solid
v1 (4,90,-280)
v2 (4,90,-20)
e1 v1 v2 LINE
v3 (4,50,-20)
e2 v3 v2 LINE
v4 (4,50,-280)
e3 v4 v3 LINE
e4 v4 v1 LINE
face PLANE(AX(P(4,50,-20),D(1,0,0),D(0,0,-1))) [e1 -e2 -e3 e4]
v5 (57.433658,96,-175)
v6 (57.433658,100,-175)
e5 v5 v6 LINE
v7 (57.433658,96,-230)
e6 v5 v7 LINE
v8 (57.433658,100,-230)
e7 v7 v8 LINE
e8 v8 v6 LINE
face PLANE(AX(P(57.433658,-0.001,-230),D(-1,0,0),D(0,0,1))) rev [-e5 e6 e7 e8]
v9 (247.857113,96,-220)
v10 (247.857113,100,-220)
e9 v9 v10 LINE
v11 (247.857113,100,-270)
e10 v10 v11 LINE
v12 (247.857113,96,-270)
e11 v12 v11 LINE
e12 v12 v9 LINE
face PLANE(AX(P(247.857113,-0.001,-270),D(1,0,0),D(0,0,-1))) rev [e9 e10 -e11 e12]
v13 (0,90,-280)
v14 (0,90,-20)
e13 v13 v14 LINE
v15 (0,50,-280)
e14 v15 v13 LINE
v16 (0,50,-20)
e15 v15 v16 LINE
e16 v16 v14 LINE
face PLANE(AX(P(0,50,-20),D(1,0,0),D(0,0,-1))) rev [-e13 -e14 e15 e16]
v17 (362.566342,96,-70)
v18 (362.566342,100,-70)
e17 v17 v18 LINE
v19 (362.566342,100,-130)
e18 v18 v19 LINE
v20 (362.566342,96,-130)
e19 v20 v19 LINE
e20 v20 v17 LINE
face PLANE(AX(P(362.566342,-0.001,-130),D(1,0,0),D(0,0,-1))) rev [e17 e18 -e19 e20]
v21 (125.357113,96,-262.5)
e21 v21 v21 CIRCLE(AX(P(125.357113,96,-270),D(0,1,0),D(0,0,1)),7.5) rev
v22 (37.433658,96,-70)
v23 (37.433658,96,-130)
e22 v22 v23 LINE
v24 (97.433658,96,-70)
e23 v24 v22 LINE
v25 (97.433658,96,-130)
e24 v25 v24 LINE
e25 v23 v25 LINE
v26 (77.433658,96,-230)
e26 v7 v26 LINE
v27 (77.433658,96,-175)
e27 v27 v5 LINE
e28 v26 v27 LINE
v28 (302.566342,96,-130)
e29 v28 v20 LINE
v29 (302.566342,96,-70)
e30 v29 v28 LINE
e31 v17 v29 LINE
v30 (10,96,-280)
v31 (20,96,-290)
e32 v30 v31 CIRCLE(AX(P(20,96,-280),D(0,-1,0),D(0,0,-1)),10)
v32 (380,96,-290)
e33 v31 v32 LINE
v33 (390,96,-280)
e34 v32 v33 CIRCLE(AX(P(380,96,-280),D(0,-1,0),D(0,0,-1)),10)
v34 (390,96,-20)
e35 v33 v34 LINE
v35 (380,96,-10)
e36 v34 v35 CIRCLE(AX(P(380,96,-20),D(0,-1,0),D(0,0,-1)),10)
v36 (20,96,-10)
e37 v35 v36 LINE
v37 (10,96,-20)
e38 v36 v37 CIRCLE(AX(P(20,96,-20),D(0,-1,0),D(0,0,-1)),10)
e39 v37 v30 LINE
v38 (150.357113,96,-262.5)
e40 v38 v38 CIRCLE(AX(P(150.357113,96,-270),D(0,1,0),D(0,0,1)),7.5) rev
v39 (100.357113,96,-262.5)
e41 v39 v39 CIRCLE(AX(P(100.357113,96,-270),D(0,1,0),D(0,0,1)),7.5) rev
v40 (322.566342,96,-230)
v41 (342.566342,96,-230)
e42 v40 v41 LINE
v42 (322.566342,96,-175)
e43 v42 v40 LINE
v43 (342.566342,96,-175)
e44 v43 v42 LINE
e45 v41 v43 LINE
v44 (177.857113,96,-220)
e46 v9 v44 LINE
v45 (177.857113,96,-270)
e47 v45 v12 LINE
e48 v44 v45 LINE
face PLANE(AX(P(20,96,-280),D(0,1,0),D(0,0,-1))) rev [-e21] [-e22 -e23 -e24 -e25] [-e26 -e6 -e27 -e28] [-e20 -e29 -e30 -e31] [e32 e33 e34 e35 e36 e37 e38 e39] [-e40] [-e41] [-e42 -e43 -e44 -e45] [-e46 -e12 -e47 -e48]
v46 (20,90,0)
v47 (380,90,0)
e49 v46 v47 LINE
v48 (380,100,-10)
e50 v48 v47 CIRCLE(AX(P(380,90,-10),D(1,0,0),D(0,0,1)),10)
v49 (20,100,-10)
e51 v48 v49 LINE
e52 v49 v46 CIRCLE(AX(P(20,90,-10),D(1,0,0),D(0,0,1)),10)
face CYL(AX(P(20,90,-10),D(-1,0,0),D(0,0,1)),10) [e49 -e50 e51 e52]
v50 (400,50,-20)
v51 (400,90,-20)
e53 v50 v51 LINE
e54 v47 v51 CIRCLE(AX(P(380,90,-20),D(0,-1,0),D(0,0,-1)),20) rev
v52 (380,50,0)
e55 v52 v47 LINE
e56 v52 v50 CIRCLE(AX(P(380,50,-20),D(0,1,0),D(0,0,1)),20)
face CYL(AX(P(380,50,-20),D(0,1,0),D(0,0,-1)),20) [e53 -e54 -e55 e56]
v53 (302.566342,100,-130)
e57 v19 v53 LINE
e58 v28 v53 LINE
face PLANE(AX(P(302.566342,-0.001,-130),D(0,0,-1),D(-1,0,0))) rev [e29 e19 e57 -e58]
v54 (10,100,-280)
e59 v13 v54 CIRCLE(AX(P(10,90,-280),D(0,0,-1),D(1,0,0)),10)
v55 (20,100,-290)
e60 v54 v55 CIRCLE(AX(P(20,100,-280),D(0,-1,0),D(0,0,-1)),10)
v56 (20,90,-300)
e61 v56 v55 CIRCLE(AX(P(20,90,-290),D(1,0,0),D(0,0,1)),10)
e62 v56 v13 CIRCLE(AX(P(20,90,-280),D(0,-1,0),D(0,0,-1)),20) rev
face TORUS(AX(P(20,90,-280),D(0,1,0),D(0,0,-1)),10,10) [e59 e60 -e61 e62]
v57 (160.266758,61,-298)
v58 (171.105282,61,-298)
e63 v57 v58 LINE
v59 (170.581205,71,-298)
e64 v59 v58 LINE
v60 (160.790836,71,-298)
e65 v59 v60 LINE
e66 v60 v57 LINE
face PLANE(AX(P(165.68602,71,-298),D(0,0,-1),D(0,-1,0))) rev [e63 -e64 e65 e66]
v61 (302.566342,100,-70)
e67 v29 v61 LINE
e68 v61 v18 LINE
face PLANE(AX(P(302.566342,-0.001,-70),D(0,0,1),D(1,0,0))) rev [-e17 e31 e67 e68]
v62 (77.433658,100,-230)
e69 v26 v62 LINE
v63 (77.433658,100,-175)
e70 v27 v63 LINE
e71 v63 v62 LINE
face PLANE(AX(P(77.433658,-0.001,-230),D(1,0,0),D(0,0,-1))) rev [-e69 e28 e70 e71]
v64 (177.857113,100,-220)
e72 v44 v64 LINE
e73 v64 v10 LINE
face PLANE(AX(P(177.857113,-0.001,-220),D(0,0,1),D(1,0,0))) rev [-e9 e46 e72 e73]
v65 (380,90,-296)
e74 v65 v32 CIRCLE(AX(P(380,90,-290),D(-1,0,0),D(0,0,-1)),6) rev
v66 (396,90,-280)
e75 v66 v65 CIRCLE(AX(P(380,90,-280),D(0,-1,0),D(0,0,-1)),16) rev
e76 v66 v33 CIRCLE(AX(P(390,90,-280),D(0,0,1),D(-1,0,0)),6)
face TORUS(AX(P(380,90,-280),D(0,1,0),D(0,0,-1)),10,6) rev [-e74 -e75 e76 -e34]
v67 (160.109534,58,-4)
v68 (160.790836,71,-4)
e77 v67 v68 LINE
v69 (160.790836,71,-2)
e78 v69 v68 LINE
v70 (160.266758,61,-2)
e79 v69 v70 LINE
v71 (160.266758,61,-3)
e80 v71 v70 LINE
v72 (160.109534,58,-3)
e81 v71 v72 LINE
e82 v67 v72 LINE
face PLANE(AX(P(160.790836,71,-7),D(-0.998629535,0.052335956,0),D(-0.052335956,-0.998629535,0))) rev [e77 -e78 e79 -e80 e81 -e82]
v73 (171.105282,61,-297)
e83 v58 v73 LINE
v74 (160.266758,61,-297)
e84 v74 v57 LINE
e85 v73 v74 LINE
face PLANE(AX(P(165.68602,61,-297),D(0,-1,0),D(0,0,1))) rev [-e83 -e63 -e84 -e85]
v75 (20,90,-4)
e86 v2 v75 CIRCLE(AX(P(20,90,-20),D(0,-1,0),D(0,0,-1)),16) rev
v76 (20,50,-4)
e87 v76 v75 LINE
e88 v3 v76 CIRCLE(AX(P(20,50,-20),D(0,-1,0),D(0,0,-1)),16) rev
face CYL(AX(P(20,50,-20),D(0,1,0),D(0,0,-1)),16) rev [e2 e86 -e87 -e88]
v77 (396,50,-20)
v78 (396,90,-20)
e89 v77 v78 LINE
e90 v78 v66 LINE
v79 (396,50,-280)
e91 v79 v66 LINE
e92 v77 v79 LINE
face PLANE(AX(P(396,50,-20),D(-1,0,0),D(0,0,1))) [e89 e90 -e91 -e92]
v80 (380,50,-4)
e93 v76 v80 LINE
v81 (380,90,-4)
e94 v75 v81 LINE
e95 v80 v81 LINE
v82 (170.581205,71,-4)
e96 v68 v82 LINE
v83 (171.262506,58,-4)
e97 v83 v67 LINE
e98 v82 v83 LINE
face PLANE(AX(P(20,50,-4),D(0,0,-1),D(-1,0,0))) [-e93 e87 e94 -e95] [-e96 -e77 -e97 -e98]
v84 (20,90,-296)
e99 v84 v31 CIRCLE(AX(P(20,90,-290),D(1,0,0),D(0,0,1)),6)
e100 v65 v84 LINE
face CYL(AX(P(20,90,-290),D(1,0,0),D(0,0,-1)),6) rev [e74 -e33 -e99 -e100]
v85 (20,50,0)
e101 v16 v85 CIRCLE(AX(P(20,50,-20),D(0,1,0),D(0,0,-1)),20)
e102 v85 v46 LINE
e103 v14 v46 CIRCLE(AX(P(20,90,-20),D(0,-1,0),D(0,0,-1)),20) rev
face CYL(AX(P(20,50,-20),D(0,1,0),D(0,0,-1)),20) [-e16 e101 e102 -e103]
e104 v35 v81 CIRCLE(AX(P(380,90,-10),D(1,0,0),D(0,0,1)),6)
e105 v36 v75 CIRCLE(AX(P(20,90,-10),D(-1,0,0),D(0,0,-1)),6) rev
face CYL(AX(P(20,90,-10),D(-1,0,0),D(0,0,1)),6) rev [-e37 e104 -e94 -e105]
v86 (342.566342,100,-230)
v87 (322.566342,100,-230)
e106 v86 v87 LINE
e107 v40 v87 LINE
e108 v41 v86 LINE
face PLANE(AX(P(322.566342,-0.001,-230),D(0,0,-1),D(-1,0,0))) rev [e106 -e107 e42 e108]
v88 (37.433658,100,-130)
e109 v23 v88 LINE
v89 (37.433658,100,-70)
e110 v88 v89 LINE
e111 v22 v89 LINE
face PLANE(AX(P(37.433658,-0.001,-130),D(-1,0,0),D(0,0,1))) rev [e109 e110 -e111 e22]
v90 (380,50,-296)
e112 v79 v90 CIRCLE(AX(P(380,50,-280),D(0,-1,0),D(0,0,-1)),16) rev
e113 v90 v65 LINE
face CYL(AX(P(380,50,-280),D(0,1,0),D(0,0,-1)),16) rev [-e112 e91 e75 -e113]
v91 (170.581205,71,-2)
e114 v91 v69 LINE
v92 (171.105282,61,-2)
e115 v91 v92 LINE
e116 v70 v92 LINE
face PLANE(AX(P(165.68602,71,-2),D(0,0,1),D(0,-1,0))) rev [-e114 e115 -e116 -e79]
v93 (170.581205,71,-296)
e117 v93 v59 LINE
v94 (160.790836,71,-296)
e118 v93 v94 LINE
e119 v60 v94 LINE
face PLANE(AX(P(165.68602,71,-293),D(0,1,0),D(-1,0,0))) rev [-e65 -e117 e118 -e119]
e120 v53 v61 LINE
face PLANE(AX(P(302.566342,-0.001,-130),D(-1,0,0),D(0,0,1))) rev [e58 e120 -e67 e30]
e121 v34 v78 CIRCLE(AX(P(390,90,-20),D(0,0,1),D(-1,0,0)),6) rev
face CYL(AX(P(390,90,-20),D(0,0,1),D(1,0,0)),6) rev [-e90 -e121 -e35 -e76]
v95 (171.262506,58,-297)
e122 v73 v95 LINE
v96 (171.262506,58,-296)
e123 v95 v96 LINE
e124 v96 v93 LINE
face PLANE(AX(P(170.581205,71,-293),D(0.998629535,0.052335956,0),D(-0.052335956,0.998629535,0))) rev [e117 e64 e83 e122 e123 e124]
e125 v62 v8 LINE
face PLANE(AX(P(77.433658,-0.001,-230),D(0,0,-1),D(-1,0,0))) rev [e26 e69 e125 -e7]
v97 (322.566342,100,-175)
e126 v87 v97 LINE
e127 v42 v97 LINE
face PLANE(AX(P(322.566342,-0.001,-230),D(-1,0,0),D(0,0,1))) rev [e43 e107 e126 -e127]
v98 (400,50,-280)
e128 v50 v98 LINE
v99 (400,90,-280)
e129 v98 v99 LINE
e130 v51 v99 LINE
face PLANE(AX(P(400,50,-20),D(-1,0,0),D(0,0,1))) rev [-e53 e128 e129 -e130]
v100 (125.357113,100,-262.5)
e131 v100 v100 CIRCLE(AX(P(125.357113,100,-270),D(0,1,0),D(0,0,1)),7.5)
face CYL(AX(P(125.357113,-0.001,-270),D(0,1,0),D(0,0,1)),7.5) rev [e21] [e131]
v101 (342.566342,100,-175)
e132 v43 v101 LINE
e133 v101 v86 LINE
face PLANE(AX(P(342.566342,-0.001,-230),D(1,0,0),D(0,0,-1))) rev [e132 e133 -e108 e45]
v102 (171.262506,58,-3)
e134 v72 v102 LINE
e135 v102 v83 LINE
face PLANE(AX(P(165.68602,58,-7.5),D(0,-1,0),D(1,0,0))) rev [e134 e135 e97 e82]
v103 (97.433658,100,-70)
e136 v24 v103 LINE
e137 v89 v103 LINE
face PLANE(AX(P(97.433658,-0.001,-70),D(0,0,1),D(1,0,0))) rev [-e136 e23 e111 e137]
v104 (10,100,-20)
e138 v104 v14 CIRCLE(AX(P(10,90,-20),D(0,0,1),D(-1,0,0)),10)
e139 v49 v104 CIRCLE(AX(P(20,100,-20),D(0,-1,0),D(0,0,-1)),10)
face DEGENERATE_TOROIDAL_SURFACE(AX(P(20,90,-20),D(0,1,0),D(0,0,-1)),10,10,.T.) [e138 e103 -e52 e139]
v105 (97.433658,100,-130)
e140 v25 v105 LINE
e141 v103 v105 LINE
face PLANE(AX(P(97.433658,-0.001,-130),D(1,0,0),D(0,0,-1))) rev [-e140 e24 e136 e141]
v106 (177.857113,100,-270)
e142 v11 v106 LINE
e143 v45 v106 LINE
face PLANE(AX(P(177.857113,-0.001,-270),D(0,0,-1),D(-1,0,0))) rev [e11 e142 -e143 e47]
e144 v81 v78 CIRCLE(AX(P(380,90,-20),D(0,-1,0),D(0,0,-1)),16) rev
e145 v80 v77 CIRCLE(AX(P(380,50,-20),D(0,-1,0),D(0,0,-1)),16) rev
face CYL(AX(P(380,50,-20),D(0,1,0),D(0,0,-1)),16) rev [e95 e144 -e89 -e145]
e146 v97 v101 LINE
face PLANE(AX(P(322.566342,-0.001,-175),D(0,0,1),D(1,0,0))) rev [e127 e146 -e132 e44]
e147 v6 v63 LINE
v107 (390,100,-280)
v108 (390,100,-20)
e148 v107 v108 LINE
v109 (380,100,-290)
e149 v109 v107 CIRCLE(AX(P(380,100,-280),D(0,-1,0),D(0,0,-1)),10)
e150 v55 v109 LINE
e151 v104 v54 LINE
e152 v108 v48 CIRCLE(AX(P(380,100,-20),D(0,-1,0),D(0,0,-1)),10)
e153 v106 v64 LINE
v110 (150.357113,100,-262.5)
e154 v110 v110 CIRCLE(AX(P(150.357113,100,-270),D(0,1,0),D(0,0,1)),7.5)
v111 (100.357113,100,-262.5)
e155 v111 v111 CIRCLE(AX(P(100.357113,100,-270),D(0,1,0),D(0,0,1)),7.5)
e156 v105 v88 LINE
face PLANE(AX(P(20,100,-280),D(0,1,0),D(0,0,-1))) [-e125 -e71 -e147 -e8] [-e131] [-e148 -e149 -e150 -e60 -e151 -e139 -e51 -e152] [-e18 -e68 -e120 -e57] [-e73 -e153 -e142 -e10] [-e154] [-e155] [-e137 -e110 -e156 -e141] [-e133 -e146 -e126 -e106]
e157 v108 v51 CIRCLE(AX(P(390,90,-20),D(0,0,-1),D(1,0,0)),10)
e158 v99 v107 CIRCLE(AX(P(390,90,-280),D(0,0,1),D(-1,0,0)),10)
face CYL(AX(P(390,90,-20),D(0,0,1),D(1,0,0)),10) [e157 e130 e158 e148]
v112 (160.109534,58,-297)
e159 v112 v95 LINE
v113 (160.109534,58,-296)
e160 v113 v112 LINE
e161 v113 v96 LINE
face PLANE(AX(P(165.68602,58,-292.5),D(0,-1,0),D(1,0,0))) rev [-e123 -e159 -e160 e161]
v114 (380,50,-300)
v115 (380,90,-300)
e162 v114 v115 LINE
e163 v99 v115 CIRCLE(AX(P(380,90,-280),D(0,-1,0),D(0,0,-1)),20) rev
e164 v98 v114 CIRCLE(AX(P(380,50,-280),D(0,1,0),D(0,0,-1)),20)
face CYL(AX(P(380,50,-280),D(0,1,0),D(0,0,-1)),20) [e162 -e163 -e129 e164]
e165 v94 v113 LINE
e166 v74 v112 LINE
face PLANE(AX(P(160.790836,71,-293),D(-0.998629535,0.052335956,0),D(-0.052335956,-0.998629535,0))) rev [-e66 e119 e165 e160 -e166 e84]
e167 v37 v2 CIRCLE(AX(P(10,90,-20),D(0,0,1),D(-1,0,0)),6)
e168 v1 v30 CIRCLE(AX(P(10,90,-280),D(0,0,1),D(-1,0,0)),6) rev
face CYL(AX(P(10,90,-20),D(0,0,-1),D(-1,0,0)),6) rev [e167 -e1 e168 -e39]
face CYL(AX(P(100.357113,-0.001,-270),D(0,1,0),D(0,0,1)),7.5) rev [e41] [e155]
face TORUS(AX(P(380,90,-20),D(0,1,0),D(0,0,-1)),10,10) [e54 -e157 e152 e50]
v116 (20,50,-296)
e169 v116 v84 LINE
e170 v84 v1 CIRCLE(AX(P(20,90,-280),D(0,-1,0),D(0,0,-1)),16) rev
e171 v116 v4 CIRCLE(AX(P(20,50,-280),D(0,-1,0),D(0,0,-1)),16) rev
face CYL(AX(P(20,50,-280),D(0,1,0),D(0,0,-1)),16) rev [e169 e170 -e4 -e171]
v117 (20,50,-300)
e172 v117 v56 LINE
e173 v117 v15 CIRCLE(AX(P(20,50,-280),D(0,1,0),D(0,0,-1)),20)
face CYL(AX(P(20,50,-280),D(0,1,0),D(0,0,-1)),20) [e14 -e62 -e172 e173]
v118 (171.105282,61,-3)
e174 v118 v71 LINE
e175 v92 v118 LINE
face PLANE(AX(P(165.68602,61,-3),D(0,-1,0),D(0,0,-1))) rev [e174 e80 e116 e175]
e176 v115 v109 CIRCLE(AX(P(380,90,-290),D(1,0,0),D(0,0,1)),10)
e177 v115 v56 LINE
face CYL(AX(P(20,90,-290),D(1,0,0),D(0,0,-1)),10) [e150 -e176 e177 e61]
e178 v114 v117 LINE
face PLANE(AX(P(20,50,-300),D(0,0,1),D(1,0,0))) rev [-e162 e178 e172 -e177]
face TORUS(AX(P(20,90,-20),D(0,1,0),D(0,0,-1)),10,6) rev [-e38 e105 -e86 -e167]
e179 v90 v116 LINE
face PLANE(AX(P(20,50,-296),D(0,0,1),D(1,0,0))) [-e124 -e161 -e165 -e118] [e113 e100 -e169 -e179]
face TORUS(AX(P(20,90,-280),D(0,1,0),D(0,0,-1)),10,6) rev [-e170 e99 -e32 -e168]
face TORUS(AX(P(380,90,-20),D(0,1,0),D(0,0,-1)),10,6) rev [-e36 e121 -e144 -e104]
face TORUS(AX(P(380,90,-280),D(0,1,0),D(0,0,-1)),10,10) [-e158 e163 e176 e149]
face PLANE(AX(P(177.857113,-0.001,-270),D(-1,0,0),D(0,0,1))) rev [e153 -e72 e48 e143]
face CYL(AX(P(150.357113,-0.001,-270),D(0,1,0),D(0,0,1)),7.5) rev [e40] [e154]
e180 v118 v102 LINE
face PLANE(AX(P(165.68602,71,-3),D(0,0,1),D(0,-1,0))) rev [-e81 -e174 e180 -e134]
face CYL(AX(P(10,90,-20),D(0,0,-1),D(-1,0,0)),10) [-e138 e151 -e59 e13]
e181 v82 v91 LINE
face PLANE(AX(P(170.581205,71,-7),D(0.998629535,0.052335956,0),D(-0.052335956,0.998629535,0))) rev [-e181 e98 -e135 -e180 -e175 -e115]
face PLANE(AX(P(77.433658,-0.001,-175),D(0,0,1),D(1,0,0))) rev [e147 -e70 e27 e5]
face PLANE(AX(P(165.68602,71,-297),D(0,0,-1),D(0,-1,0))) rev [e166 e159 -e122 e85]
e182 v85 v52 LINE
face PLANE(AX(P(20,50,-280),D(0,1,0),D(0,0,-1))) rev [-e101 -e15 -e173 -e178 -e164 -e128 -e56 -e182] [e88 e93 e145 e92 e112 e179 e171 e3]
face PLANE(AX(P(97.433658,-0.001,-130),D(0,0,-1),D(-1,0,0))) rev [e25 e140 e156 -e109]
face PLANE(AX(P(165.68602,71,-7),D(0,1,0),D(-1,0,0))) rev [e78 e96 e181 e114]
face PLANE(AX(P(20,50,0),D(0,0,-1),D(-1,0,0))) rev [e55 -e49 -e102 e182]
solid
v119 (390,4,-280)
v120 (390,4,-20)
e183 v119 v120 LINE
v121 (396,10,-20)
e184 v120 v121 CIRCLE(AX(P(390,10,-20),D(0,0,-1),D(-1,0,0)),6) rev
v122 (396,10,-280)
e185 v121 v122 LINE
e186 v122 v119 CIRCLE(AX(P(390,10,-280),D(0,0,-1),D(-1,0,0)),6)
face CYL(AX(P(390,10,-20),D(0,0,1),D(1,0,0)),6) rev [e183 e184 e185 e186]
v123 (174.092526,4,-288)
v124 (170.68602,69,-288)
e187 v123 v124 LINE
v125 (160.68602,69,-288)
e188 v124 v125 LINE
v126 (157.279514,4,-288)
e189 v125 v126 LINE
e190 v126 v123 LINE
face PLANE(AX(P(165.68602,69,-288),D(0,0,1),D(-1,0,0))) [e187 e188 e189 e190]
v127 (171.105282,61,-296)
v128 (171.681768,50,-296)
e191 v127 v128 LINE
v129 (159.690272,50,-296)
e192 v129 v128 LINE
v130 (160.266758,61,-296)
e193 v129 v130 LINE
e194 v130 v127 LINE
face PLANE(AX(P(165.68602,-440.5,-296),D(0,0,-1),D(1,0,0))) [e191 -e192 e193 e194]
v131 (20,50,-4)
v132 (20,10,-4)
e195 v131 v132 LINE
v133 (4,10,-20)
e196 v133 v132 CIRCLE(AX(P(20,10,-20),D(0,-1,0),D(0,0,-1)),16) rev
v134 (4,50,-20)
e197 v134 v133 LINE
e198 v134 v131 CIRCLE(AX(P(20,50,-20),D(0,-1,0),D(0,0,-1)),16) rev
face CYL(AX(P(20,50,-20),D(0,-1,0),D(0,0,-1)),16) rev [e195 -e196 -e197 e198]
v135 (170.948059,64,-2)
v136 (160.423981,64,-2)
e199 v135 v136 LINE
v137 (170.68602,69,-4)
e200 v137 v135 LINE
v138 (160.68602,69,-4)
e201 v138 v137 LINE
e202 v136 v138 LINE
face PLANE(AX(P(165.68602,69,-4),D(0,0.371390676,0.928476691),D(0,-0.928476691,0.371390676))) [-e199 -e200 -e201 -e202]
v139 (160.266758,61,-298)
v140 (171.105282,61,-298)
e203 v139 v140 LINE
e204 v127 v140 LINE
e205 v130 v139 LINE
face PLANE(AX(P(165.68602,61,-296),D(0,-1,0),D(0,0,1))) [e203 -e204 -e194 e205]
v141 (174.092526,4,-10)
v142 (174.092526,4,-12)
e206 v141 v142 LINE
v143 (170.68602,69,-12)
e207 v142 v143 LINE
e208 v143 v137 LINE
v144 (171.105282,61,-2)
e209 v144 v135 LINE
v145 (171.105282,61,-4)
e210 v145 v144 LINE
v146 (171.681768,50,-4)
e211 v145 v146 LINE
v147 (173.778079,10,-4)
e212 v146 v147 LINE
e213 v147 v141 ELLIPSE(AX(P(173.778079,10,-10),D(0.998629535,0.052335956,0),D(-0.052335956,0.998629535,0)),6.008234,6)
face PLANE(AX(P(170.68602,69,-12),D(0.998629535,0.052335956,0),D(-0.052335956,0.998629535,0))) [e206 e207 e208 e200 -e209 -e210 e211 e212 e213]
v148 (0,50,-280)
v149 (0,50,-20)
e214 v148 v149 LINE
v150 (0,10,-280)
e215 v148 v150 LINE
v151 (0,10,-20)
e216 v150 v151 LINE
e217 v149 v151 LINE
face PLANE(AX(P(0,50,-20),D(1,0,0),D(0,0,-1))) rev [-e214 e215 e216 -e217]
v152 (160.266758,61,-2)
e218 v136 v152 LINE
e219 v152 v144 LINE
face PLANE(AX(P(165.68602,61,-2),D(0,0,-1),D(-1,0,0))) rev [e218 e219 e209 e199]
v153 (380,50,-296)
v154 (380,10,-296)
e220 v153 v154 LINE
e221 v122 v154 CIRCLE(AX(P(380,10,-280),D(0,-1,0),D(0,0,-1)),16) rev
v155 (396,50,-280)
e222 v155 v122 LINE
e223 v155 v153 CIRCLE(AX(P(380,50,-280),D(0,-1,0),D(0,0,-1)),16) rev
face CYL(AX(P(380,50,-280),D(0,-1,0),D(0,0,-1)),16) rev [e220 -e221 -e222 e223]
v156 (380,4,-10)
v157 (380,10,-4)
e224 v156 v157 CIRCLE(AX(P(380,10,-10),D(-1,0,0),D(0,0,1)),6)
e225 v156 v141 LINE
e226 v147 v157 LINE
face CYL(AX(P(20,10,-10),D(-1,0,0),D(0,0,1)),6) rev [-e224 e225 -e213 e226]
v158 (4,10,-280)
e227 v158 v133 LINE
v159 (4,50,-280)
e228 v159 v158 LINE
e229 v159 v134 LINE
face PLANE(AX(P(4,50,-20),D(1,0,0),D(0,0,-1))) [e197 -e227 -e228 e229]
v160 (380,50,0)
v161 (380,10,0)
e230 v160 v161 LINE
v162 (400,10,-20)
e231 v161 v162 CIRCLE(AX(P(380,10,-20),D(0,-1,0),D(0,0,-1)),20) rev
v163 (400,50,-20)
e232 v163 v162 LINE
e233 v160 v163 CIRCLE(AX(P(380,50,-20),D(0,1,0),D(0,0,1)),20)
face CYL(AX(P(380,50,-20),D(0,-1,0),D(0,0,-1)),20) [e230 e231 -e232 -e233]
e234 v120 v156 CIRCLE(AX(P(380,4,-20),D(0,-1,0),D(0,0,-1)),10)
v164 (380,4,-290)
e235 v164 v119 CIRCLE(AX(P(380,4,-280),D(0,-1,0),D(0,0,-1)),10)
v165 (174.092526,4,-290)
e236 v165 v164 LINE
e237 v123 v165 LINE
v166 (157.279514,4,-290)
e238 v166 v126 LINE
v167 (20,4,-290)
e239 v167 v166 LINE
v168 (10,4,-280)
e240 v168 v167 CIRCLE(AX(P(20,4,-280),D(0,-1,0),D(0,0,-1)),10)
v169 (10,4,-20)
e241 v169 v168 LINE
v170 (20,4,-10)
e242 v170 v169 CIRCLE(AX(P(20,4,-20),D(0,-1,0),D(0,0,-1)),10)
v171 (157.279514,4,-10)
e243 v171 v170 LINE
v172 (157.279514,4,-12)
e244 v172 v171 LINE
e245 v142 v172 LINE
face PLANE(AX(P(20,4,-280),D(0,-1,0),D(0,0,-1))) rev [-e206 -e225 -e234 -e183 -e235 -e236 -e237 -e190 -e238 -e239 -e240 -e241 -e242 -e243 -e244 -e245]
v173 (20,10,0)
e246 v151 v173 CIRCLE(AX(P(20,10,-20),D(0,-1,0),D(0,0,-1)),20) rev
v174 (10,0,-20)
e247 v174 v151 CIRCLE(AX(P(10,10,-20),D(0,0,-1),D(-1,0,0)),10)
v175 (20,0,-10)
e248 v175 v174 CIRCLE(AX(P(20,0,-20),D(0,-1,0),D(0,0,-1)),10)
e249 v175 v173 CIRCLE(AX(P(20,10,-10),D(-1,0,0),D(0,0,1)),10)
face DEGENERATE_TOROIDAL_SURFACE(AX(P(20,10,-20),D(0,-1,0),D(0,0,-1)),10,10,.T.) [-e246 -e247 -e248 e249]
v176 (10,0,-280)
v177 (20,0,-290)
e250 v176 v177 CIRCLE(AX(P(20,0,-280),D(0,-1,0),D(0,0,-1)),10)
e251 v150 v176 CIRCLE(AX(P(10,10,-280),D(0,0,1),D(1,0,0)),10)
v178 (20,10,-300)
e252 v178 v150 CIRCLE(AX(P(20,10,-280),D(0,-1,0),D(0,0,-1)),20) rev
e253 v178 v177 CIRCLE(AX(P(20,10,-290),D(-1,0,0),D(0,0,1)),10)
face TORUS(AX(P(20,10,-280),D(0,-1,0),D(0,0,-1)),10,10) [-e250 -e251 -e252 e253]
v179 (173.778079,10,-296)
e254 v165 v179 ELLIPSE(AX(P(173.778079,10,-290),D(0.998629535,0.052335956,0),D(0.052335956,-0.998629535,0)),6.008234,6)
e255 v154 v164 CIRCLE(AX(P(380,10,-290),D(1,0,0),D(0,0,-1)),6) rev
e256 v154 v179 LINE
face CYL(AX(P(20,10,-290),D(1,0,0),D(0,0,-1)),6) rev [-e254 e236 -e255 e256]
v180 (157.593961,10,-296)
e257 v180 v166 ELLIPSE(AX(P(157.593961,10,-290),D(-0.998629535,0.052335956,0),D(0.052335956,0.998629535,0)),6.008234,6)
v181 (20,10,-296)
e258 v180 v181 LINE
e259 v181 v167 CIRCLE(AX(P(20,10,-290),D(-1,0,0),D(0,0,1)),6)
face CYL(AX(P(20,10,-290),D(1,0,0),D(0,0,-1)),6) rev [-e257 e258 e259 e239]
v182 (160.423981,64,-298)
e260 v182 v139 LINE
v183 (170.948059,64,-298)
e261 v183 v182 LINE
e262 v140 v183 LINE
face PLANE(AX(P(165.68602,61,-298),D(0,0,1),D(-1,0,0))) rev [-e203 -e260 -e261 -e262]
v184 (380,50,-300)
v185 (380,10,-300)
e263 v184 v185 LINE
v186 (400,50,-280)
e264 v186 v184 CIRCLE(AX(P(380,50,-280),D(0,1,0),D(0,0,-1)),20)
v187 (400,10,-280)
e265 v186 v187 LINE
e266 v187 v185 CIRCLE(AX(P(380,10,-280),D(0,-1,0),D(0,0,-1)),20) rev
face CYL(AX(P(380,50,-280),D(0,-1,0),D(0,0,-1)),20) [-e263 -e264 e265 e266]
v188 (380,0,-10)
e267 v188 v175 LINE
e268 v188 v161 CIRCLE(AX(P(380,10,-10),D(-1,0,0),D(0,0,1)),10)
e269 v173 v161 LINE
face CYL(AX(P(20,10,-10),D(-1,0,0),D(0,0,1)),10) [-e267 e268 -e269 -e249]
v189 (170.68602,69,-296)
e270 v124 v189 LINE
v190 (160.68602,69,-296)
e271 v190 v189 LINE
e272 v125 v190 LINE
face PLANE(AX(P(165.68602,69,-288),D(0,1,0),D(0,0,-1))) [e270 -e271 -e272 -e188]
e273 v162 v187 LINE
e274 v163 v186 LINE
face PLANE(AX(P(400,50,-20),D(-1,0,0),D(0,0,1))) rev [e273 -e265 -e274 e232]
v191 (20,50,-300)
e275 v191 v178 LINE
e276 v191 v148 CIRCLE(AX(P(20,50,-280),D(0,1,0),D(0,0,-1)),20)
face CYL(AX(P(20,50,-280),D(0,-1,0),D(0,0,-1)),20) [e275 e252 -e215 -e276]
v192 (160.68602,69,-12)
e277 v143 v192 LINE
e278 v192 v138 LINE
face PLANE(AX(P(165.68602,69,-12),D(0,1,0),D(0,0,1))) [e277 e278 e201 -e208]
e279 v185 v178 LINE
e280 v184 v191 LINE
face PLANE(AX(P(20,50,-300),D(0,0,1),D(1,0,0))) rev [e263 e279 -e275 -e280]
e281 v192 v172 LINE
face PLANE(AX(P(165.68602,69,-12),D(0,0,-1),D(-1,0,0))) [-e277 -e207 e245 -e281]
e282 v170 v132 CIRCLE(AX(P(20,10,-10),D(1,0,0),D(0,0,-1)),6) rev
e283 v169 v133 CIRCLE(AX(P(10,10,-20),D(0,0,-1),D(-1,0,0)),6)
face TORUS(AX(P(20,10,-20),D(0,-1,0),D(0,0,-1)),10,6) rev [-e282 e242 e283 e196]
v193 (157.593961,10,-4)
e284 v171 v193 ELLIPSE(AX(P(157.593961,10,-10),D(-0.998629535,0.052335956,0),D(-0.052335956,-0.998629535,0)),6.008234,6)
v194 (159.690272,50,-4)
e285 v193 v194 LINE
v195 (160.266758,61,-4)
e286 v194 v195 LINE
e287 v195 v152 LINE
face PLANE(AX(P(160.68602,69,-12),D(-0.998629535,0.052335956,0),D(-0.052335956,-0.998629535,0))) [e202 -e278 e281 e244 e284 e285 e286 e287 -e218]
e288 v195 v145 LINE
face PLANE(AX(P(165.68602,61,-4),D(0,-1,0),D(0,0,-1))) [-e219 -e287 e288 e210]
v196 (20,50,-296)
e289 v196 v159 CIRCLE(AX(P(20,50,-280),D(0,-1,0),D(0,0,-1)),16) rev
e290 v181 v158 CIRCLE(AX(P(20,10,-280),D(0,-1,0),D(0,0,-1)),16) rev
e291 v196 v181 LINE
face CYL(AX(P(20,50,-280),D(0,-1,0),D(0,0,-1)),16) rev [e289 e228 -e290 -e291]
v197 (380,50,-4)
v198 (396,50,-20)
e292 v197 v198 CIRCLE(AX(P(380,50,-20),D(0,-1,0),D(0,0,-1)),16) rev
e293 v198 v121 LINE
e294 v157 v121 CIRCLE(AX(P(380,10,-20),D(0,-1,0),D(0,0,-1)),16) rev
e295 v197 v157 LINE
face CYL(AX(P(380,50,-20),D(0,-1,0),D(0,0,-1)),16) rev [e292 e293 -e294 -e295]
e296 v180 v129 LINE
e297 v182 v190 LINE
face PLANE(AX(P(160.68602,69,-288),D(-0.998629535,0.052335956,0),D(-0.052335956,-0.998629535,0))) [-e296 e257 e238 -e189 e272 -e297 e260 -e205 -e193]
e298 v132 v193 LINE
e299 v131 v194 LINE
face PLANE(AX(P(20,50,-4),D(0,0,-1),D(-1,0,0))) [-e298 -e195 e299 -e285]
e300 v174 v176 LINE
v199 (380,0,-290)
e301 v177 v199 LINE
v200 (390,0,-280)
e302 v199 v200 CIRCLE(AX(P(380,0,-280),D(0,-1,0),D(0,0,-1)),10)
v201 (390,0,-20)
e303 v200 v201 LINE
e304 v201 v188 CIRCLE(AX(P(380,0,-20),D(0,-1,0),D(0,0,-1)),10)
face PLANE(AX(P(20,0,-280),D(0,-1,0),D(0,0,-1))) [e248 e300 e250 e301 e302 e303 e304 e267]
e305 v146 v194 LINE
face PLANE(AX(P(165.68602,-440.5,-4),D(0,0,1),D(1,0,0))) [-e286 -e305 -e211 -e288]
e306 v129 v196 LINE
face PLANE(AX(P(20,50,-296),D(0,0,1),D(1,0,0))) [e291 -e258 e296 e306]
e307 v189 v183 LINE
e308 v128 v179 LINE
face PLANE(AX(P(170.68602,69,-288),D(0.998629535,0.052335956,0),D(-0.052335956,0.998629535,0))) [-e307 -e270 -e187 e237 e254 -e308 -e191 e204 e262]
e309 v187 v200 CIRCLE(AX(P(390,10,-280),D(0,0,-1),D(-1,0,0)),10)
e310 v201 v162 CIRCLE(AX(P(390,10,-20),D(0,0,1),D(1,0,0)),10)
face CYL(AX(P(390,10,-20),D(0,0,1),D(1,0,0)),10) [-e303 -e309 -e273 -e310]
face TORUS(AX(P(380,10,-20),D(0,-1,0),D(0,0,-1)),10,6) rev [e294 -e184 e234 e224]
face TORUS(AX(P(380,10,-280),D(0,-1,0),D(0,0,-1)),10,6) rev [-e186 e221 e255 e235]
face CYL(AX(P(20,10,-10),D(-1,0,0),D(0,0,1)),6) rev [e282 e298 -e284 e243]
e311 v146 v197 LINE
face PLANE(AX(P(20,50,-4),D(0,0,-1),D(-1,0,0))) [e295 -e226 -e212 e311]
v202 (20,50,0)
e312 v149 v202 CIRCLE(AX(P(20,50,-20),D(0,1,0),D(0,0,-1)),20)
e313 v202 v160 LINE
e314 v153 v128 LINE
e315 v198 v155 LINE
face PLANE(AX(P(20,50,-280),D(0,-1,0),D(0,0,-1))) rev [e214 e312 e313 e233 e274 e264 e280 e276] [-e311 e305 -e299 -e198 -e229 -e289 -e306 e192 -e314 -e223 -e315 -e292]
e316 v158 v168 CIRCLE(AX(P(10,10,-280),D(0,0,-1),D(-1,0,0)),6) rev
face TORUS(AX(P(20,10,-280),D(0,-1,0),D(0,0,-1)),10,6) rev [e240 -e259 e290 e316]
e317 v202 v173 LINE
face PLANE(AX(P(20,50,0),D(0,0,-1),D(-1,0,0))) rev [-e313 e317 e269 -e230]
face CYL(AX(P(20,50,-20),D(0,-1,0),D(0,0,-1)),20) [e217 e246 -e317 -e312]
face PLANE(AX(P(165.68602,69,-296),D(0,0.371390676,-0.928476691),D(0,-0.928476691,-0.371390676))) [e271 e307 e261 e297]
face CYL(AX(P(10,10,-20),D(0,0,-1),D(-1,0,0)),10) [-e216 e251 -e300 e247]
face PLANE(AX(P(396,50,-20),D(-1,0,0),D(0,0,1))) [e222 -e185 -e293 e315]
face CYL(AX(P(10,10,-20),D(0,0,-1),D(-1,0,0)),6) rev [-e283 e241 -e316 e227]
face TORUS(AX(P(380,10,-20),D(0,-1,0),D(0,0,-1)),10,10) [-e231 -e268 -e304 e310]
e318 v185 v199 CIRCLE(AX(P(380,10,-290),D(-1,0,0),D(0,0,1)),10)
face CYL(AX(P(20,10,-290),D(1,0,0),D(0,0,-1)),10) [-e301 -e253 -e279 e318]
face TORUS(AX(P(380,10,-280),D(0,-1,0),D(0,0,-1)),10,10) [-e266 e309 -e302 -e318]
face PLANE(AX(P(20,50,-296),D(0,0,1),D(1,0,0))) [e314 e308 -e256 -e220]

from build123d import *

# Parameters (mm, degrees)
BOSS_EXTRUDE1_DEPTH  = 50
FILLET1_R            = 10
SHELL1_T             = -4
SNAP_START           = -296
SNAP_HOOK1_DEPTH     = 8
SNAP_HOOK1_2_DEPTH   = 8
SNAP_START_2         = -298
SNAP_GROOVE1_DEPTH   = 3
SNAP_START_3         = -297
SNAP_GROOVE1_2_DEPTH = 2
SKETCH6_R            = 7.5
SKETCH6_W            = 70
SKETCH6_H            = 50
CUT_EXTRUDE1_DEPTH   = 4
SKETCH4_W            = 60
SKETCH4_H            = 60
SKETCH4_W_2          = 20
SKETCH4_H_2          = 55
CUT_EXTRUDE2_DEPTH   = 4


with BuildPart() as part:
    # Sketch1 → Boss-Extrude1 (new body)
    with BuildSketch(Plane(origin=(0, 0, 0), x_dir=(1, 0, 0), z_dir=(0, 1, 0))):
        with BuildLine():
            Line((20, 0), (380, 0))
            ThreePointArc((380, 0), (394.142135624, 5.857864376), (400, 20))
            Line((400, 20), (400, 280))
            ThreePointArc((400, 280), (394.142135624, 294.142135624), (380, 300))
            Line((380, 300), (20, 300))
            ThreePointArc((20, 300), (5.857864376, 294.142135624), (0, 280))
            Line((0, 280), (0, 20))
            ThreePointArc((0, 20), (5.857864376, 5.857864376), (20, 0))
        make_face()
    extrude(amount=BOSS_EXTRUDE1_DEPTH)

    # Fillet1
    fillet1_edges = [part.edges().sort_by_distance(p)[0] for p in [
        (200, 0, 0),
        (5.857864376, 0, -5.857864376),
        (0, 0, -150),
        (5.857864376, 0, -294.142135624),
        (200, 0, -300),
        (394.142135624, 0, -294.142135624),
        (400, 0, -150),
        (394.142135624, 0, -5.857864376),
    ]]
    fillet(fillet1_edges, radius=FILLET1_R)

    # Shell1
    shell1_openings = [part.faces().sort_by_distance(p)[0] for p in [
        (200, 50, -150),
    ]]
    offset(amount=SHELL1_T, openings=shell1_openings, kind=Kind.INTERSECTION)


with BuildPart() as body_2:
    # Mirror1: mirrored copy
    add(part.part.mirror(Plane(origin=(20, 50, -280), x_dir=(0, 0, 1), z_dir=(0, -1, 0))))

    # Snap Groove1: read off the stored shape, not the designer's step
    # Snap Groove1 outline → Snap Groove1 (cut)
    with BuildSketch(Plane.XY.offset(SNAP_START_2)):
        Polygon((160.790835622, 71), (160.26675783, 61), (171.105282298, 61), (170.581204505, 71), align=None)
    snap_groove1 = extrude(amount=SNAP_GROOVE1_DEPTH, mode=Mode.SUBTRACT)

    # Snap Groove1 2 outline → Snap Groove1 2 (cut)
    with BuildSketch(Plane.XY.offset(SNAP_START_3)):
        Polygon((171.105282298, 61), (160.266757829, 61), (160.109534492, 58), (171.262505636, 58), align=None)
    snap_groove1_2 = extrude(amount=SNAP_GROOVE1_2_DEPTH, mode=Mode.SUBTRACT)

    # Mirror4: Snap Groove1, Snap Groove1 2 across plane
    add(snap_groove1.mirror(Plane.XY.offset(-150)), mode=Mode.SUBTRACT)
    add(snap_groove1_2.mirror(Plane.XY.offset(-150)), mode=Mode.SUBTRACT)

    # Sketch6 → Cut-Extrude1 (cut)
    with BuildSketch(Plane(origin=(0, 100, 0), x_dir=(1, 0, 0), z_dir=(0, 1, 0))):
        with Locations(Location((150.357112629, 270, 0), (0, 0, 270))):
            Circle(SKETCH6_R)
        with Locations(Location((125.357112629, 270, 0), (0, 0, 270))):
            Circle(SKETCH6_R)
        with Locations(Location((100.357112629, 270, 0), (0, 0, 270))):
            Circle(SKETCH6_R)
        with Locations((212.857112629, 245)):
            Rectangle(SKETCH6_W, SKETCH6_H)
    extrude(amount=-CUT_EXTRUDE1_DEPTH, mode=Mode.SUBTRACT)

    # Sketch4 → Cut-Extrude2 (cut)
    with BuildSketch(Plane(origin=(0, 100, 0), x_dir=(1, 0, 0), z_dir=(0, 1, 0))):
        with Locations((332.566341506, 100)):
            Rectangle(SKETCH4_W, SKETCH4_H)
        with Locations((332.566341506, 202.5)):
            Rectangle(SKETCH4_W_2, SKETCH4_H_2)
        with Locations((67.433658494, 100)):
            Rectangle(SKETCH4_W, SKETCH4_H)
        with Locations((67.433658494, 202.5)):
            Rectangle(SKETCH4_W_2, SKETCH4_H_2)
    extrude(amount=-CUT_EXTRUDE2_DEPTH, mode=Mode.SUBTRACT)


with BuildPart() as part_1:
    add(part.part)

    # Snap Hook1: read off the stored shape, not the designer's step
    # Snap Hook1 outline → Snap Hook1 (add)
    with BuildSketch(Plane.XY.offset(SNAP_START)):
        Polygon((171.105282298, 61), (170.686020064, 69), (160.686020064, 69), (160.26675783, 61), align=None)
    snap_hook1 = extrude(amount=SNAP_HOOK1_DEPTH)

    # Snap Hook1 2 outline → Snap Hook1 2 (add)
    with BuildSketch(Plane.XY.offset(SNAP_START)):
        Polygon((171.105282298, 61), (160.266757829, 61), (157.27951441, 4), (174.092525717, 4), align=None)
    snap_hook1_2 = extrude(amount=SNAP_HOOK1_2_DEPTH)

    # Snap Hook1 3: loft between two sections, ruled curve by curve
    snap_hook1_3_from = [
        Edge.make_line((160.686020064, 69, -296), (170.686020064, 69, -296)),
        Edge.make_line((171.105282298, 61, -296), (160.266757829, 61, -296)),
        Edge.make_line((171.105282298, 61, -296), (170.686020064, 69, -296)),
        Edge.make_line((160.266757829, 61, -296), (160.686020064, 69, -296)),
    ]
    snap_hook1_3_to = [
        Edge.make_line((160.423981167, 64, -298), (170.94805896, 64, -298)),
        Edge.make_line((171.105282298, 61, -298), (160.266757829, 61, -298)),
        Edge.make_line((171.105282298, 61, -298), (170.94805896, 64, -298)),
        Edge.make_line((160.266757829, 61, -298), (160.423981167, 64, -298)),
    ]
    snap_hook1_3 = Solid(Shell([*[Face.make_surface_from_curves(snap_hook1_3_from[k], snap_hook1_3_to[k]) for k in range(4)], Face(Wire(snap_hook1_3_from)), Face(Wire(snap_hook1_3_to))]))
    add(snap_hook1_3)

    # Mirror3: Snap Hook1, Snap Hook1 2, Snap Hook1 3 across plane
    add(snap_hook1.mirror(Plane.XY.offset(-150)))
    add(snap_hook1_2.mirror(Plane.XY.offset(-150)))
    add(snap_hook1_3.mirror(Plane.XY.offset(-150)))


solid = Compound([body_2.part, part_1.part])
